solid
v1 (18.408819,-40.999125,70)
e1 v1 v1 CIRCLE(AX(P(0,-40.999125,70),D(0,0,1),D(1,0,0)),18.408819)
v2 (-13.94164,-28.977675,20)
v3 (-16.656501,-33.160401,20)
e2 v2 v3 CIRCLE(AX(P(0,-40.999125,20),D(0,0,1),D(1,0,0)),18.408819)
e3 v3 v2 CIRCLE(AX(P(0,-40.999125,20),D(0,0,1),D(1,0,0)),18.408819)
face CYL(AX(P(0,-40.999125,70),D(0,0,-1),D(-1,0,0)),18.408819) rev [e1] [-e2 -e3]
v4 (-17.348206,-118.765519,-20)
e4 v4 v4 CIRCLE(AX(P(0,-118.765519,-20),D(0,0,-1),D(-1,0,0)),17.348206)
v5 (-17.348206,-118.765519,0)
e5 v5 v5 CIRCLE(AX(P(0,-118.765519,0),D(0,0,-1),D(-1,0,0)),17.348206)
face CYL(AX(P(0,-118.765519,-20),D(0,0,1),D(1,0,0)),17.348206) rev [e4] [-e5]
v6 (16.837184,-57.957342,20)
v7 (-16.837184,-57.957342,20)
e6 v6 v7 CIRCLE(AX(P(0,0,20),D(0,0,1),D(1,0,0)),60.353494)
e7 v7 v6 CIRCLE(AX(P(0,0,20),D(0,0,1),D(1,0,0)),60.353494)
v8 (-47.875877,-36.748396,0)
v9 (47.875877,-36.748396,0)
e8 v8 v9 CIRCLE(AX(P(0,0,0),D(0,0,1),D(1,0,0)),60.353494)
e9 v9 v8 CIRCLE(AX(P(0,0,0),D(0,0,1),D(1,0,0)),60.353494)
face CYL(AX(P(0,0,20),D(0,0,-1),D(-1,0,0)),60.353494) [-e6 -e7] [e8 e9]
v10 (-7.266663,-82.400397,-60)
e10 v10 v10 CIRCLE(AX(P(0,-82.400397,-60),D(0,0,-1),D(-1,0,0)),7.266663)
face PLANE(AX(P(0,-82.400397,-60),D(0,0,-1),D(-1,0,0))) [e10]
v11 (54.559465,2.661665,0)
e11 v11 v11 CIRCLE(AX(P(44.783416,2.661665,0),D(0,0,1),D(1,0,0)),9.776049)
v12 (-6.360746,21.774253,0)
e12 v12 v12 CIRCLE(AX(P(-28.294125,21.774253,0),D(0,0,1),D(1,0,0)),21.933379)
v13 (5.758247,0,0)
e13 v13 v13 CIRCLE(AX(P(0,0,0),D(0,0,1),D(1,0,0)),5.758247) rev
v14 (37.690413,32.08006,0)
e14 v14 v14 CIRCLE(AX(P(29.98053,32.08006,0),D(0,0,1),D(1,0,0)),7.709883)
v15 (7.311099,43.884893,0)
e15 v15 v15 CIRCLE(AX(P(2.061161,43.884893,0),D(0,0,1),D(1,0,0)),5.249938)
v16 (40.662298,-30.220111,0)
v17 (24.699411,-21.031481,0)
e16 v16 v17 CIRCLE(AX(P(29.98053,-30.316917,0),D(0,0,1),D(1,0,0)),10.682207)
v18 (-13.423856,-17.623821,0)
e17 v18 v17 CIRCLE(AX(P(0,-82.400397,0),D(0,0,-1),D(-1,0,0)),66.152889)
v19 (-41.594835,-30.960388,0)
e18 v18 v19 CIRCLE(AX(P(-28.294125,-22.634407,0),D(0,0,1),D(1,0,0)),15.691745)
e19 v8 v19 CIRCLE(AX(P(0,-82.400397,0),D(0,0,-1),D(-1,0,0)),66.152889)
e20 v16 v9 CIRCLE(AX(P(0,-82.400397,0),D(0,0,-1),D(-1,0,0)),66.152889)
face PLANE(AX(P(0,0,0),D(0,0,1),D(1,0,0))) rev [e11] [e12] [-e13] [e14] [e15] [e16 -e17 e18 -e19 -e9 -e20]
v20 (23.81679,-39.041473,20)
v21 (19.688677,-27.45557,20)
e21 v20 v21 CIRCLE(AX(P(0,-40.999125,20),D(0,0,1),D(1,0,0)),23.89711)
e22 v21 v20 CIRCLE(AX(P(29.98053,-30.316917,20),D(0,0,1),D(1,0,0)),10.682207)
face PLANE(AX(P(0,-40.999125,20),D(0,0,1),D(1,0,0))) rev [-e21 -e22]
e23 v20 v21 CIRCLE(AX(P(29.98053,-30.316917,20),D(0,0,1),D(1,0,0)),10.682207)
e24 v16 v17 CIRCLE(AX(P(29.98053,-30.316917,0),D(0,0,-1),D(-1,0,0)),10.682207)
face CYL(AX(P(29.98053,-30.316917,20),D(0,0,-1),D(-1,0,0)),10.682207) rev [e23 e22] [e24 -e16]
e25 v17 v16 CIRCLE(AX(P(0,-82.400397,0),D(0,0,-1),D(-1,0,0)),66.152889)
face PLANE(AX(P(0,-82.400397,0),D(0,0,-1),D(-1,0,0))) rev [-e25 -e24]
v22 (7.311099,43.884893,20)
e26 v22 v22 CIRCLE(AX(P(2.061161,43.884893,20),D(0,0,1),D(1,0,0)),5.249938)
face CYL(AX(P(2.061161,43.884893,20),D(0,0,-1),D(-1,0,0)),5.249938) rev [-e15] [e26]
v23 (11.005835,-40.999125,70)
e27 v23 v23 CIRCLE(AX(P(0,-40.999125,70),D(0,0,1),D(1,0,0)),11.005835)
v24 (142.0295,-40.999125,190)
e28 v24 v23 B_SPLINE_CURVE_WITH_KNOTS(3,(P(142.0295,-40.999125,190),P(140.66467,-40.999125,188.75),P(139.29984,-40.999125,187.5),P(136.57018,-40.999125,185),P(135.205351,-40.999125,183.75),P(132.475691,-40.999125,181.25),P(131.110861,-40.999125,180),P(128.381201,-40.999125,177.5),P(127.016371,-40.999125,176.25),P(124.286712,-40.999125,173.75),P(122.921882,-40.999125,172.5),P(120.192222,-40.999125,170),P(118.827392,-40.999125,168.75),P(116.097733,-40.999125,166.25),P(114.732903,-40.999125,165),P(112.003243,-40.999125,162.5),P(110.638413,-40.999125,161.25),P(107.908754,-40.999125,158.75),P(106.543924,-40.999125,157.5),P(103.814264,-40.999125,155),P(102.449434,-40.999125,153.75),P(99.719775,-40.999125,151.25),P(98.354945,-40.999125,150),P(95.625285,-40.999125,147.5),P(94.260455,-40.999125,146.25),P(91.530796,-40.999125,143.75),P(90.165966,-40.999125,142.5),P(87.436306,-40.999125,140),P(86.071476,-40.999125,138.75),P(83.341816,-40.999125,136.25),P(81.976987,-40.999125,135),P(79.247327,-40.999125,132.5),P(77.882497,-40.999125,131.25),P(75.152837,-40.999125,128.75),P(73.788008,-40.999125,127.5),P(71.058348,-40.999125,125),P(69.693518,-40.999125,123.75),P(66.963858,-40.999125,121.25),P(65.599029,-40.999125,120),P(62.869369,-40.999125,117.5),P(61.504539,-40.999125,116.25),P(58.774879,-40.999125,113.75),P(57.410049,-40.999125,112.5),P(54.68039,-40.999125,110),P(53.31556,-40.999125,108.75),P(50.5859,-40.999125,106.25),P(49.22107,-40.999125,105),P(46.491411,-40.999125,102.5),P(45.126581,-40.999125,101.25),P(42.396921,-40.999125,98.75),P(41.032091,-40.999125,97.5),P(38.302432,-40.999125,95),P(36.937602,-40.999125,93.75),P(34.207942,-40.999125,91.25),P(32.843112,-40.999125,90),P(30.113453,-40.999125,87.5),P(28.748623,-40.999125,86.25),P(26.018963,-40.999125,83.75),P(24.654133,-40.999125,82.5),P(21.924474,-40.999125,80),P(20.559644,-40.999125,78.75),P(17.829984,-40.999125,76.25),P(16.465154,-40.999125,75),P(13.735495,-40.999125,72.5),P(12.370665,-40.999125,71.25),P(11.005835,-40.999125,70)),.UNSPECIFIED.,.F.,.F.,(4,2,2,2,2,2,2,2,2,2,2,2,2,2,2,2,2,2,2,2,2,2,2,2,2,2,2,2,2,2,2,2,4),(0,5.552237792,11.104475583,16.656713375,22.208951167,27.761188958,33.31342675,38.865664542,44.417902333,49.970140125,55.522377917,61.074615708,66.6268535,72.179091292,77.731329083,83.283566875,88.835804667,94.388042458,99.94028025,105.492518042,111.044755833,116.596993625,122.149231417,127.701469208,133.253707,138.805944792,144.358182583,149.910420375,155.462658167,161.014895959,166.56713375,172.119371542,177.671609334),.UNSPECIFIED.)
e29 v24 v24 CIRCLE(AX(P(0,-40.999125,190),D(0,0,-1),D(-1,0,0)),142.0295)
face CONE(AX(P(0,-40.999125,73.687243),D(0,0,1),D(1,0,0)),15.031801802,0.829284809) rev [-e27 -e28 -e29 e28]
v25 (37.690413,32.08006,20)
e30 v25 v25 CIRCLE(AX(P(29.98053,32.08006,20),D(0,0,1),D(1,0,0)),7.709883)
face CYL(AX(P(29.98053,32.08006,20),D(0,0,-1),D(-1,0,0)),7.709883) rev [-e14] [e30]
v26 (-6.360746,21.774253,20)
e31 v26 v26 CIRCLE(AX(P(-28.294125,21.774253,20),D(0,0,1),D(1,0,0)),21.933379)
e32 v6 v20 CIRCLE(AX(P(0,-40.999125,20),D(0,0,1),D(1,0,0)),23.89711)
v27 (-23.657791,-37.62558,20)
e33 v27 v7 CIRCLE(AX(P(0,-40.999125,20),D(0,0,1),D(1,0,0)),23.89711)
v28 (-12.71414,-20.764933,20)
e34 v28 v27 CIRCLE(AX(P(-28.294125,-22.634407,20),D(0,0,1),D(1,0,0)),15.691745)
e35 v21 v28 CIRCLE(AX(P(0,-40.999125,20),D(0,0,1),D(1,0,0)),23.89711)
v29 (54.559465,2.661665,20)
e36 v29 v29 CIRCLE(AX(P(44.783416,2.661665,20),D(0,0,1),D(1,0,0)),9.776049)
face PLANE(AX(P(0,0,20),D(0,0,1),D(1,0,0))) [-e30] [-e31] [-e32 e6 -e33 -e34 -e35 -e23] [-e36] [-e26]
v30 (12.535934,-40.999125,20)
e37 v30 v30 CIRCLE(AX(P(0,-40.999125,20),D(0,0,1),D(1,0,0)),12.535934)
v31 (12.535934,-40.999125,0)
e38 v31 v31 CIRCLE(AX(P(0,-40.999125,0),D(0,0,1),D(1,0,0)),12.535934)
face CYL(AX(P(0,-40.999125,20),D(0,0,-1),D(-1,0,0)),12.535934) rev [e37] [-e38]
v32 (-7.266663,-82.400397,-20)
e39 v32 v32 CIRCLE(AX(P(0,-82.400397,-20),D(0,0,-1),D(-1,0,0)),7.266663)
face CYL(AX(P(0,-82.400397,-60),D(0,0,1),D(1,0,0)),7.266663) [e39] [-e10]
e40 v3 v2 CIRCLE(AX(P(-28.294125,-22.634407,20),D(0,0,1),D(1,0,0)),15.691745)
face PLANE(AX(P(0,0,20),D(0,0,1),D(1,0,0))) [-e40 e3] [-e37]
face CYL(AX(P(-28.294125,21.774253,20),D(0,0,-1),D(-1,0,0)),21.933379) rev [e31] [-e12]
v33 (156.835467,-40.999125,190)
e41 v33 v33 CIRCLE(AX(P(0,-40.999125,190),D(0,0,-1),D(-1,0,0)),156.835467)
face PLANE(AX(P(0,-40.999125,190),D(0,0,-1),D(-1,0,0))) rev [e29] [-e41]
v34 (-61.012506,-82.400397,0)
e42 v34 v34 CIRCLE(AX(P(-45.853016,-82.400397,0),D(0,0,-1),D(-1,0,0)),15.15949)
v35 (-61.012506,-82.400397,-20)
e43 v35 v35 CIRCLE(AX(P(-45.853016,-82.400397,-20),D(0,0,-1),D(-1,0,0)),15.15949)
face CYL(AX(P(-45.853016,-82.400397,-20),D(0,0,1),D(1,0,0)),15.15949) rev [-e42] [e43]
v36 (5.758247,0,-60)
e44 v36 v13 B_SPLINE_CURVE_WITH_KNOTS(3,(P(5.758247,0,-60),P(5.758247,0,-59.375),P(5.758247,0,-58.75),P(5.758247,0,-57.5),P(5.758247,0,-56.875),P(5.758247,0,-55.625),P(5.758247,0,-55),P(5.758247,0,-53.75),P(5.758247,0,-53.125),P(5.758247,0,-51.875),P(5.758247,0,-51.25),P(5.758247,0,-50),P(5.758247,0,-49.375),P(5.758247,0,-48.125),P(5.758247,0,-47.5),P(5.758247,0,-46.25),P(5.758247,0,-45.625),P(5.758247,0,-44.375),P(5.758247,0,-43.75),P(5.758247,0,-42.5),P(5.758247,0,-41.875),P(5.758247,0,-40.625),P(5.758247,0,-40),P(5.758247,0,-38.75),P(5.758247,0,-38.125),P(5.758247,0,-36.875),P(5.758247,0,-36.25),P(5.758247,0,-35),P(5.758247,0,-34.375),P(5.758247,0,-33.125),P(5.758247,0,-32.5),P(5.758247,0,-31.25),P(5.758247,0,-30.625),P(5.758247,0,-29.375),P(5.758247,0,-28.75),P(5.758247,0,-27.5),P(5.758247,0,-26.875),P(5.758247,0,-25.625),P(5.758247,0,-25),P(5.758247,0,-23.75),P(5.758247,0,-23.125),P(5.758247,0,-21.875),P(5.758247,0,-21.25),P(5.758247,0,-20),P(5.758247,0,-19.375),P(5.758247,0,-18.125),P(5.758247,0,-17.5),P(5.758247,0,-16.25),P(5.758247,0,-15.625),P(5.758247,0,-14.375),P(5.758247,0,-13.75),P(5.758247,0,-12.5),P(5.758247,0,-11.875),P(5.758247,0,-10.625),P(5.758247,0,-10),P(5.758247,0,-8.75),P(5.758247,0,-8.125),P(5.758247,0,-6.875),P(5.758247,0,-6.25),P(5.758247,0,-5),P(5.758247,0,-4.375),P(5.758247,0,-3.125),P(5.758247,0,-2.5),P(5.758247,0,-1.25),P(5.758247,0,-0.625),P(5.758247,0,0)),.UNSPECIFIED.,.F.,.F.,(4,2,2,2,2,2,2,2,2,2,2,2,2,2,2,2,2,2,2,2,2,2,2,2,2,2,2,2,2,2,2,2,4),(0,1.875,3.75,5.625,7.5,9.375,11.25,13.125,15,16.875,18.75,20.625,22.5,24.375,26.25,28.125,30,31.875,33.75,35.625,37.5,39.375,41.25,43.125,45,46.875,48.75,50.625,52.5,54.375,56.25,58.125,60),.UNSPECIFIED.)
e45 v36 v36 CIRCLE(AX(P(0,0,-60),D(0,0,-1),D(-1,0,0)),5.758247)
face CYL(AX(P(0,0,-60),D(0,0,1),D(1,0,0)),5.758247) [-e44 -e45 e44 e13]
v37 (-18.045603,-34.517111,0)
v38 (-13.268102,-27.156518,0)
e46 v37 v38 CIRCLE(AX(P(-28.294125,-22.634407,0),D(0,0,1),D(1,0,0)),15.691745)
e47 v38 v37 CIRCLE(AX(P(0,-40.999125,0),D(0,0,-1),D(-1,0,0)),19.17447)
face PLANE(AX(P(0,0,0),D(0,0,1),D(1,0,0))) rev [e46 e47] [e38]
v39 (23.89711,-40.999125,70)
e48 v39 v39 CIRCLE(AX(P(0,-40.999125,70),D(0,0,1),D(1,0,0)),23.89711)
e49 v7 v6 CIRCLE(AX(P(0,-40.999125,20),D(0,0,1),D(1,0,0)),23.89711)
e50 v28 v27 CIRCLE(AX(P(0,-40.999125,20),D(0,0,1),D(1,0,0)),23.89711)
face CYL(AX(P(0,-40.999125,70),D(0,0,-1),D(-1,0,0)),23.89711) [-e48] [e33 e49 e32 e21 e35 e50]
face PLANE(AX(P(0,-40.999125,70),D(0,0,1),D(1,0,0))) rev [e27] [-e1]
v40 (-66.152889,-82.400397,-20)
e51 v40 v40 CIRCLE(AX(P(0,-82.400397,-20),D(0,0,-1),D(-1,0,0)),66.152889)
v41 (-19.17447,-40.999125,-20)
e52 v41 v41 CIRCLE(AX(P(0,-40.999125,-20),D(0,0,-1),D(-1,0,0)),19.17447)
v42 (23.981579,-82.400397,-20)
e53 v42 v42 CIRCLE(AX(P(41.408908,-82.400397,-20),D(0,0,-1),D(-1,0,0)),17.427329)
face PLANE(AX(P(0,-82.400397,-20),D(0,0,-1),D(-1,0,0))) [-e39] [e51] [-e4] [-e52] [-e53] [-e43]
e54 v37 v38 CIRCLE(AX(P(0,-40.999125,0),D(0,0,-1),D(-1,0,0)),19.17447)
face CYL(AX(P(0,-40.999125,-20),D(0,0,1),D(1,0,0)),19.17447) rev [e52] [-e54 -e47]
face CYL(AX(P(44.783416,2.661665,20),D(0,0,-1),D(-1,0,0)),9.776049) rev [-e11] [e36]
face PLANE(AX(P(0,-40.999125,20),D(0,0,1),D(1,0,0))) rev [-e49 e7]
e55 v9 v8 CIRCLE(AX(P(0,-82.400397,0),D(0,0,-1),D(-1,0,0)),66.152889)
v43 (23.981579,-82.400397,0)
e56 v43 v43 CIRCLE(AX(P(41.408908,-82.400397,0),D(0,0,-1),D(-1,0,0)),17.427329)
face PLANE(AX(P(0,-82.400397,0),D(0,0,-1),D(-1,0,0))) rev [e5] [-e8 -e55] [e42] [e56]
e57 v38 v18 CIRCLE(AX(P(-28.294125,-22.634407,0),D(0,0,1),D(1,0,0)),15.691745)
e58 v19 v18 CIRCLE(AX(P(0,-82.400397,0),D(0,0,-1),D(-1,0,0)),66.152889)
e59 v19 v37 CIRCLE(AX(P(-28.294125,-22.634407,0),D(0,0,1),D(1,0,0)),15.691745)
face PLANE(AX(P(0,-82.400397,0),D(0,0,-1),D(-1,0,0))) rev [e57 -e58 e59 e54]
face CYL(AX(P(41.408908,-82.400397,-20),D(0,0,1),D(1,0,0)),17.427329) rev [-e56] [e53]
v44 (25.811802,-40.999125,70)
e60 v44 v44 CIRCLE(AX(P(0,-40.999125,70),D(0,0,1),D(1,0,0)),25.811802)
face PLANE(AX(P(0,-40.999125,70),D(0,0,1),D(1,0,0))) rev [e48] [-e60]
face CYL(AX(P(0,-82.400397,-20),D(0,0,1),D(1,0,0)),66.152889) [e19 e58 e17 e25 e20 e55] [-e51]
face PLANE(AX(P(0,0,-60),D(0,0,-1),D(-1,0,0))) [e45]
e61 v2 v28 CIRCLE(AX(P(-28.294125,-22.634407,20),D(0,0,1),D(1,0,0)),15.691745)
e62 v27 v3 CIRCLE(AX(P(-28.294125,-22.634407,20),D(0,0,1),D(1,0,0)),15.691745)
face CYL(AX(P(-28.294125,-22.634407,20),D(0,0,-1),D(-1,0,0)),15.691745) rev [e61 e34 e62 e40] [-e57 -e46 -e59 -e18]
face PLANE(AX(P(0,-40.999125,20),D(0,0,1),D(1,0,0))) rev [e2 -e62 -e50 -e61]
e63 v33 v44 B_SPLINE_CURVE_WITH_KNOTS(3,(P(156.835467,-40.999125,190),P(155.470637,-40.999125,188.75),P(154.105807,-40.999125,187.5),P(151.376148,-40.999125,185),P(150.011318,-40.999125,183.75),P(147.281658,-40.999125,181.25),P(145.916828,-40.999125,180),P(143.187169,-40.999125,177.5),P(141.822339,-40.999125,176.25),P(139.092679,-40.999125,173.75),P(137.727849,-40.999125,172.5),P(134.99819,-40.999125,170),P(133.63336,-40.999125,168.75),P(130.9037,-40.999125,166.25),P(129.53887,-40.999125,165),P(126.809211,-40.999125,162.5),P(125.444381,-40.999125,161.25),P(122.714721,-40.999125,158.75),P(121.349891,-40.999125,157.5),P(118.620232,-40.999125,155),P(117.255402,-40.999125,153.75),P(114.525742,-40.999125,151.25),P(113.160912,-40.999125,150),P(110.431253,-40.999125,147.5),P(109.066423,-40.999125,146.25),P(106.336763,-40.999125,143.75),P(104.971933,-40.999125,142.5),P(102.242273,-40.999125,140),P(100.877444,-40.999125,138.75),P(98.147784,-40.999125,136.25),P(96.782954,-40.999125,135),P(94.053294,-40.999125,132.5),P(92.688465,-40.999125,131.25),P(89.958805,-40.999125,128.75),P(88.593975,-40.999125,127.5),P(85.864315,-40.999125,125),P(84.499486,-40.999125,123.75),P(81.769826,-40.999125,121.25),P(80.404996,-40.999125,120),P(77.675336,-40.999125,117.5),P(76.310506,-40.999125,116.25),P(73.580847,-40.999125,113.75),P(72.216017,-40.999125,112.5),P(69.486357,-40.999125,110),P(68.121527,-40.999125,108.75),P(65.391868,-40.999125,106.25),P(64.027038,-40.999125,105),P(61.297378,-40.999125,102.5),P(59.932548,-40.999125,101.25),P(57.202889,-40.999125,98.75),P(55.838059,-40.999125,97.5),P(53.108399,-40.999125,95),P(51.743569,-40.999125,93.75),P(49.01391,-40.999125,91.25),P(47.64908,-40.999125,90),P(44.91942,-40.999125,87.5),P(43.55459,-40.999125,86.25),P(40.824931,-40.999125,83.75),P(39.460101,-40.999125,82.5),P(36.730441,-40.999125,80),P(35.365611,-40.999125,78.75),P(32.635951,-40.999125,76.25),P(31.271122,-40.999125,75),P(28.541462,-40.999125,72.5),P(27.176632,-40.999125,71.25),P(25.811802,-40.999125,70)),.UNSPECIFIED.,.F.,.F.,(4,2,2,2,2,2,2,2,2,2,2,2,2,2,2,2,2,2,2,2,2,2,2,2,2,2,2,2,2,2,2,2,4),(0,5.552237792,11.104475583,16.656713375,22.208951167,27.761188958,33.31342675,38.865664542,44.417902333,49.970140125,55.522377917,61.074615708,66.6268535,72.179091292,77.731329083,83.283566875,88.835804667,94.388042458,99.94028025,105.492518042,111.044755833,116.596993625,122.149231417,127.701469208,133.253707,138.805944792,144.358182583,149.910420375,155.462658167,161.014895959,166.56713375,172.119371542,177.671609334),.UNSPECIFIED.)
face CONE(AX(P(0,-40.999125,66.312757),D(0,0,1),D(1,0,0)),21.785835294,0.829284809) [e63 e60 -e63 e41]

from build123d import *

# Parameters (mm, degrees)
SKETCH_1_R      = 60.353493774
SKETCH_1_R_2    = 5.249937669
SKETCH_1_R_3    = 7.709883183
SKETCH_1_R_4    = 9.776049215
SKETCH_1_R_5    = 10.682207241
SKETCH_1_R_6    = 12.535934249
SKETCH_1_R_7    = 15.691744865
SKETCH_1_R_8    = 21.933378779
EXTRUDE_1_DEPTH = 20
SKETCH_2_R      = 23.897110151
SKETCH_2_R_2    = 18.408818548
EXTRUDE_2_DEPTH = 50
SKETCH_5_R      = 5.758247264
EXTRUDE_3_DEPTH = 60
SKETCH_6_R      = 66.152888952
SKETCH_6_R_2    = 19.174469575
SKETCH_6_R_3    = 15.159489644
SKETCH_6_R_4    = 17.427329396
SKETCH_6_R_5    = 17.348205871
EXTRUDE_4_DEPTH = 20
SKETCH_7_R      = 7.266662744
EXTRUDE_5_DEPTH = 40


# Read off the part's stored shape, not the designer's step: 放样-薄件1
with BuildPart() as part:
    # 草图1 → 凸台-拉伸1 (new body)
    with BuildSketch(Plane.XY):
        Circle(SKETCH_1_R)
        with Locations((2.061161415, 43.884893492)):
            Circle(SKETCH_1_R_2, mode=Mode.SUBTRACT)
        with Locations((29.98052968, 32.080059931)):
            Circle(SKETCH_1_R_3, mode=Mode.SUBTRACT)
        with Locations((44.783416209, 2.661665183)):
            Circle(SKETCH_1_R_4, mode=Mode.SUBTRACT)
        with Locations((29.98052968, -30.316917465)):
            Circle(SKETCH_1_R_5, mode=Mode.SUBTRACT)
        with Locations((0, -40.999124706)):
            Circle(SKETCH_1_R_6, mode=Mode.SUBTRACT)
        with Locations((-28.294124885, -22.634406734)):
            Circle(SKETCH_1_R_7, mode=Mode.SUBTRACT)
        with Locations((-28.294124885, 21.774252854)):
            Circle(SKETCH_1_R_8, mode=Mode.SUBTRACT)
    extrude(amount=EXTRUDE_1_DEPTH)

    # 草图2 → 凸台-拉伸2 (add)
    with BuildSketch(Plane.XY.offset(20)):
        with Locations(Location((0, -40.999124706, 0), (0, 0, 171.88446927))):
            Circle(SKETCH_2_R)
        with Locations(Location((0, -40.999124706, 0), (0, 0, 154.797833564))):
            Circle(SKETCH_2_R_2, mode=Mode.SUBTRACT)
    extrude(amount=EXTRUDE_2_DEPTH)

    # 放样-薄件1 outline → 放样-薄件1 (revolve)
    with BuildSketch(Plane.XZ.offset(40.999124706)):
        Polygon((142.029499723, 190), (11.005834825, 70), (25.81180227, 70), (156.835467167, 190), align=None)
    revolve(axis=Axis((0, -40.999124706, 0), (0, 0, 1)))

    # 草图5 → 凸台-拉伸3 (add)
    with BuildSketch(Plane(origin=(0, 0, 0), x_dir=(-1, 0, 0), z_dir=(0, 0, -1))):
        with Locations(Location((0, 0, 0), (0, 0, 180))):
            Circle(SKETCH_5_R)
    extrude(amount=EXTRUDE_3_DEPTH)

    # 草图6 → 凸台-拉伸4 (add)
    with BuildSketch(Plane(origin=(0, 0, 0), x_dir=(-1, 0, 0), z_dir=(0, 0, -1))):
        with Locations(Location((0, -82.400396549, 0), (0, 0, 136.362104422))):
            Circle(SKETCH_6_R)
        with Locations(Location((0, -40.999124706, 0), (0, 0, 46.213976219))):
            Circle(SKETCH_6_R_2, mode=Mode.SUBTRACT)
        with Locations((45.85301636, -82.400396549)):
            Circle(SKETCH_6_R_3, mode=Mode.SUBTRACT)
        with Locations((-41.408908427, -82.400396549)):
            Circle(SKETCH_6_R_4, mode=Mode.SUBTRACT)
        with Locations((0, -118.765519068)):
            Circle(SKETCH_6_R_5, mode=Mode.SUBTRACT)
    extrude(amount=EXTRUDE_4_DEPTH)

    # 草图7 → 凸台-拉伸5 (add)
    with BuildSketch(Plane(origin=(0, 0, -20), x_dir=(-1, 0, 0), z_dir=(0, 0, -1))):
        with Locations((0, -82.400396549)):
            Circle(SKETCH_7_R)
    extrude(amount=EXTRUDE_5_DEPTH)


solid = part.part
